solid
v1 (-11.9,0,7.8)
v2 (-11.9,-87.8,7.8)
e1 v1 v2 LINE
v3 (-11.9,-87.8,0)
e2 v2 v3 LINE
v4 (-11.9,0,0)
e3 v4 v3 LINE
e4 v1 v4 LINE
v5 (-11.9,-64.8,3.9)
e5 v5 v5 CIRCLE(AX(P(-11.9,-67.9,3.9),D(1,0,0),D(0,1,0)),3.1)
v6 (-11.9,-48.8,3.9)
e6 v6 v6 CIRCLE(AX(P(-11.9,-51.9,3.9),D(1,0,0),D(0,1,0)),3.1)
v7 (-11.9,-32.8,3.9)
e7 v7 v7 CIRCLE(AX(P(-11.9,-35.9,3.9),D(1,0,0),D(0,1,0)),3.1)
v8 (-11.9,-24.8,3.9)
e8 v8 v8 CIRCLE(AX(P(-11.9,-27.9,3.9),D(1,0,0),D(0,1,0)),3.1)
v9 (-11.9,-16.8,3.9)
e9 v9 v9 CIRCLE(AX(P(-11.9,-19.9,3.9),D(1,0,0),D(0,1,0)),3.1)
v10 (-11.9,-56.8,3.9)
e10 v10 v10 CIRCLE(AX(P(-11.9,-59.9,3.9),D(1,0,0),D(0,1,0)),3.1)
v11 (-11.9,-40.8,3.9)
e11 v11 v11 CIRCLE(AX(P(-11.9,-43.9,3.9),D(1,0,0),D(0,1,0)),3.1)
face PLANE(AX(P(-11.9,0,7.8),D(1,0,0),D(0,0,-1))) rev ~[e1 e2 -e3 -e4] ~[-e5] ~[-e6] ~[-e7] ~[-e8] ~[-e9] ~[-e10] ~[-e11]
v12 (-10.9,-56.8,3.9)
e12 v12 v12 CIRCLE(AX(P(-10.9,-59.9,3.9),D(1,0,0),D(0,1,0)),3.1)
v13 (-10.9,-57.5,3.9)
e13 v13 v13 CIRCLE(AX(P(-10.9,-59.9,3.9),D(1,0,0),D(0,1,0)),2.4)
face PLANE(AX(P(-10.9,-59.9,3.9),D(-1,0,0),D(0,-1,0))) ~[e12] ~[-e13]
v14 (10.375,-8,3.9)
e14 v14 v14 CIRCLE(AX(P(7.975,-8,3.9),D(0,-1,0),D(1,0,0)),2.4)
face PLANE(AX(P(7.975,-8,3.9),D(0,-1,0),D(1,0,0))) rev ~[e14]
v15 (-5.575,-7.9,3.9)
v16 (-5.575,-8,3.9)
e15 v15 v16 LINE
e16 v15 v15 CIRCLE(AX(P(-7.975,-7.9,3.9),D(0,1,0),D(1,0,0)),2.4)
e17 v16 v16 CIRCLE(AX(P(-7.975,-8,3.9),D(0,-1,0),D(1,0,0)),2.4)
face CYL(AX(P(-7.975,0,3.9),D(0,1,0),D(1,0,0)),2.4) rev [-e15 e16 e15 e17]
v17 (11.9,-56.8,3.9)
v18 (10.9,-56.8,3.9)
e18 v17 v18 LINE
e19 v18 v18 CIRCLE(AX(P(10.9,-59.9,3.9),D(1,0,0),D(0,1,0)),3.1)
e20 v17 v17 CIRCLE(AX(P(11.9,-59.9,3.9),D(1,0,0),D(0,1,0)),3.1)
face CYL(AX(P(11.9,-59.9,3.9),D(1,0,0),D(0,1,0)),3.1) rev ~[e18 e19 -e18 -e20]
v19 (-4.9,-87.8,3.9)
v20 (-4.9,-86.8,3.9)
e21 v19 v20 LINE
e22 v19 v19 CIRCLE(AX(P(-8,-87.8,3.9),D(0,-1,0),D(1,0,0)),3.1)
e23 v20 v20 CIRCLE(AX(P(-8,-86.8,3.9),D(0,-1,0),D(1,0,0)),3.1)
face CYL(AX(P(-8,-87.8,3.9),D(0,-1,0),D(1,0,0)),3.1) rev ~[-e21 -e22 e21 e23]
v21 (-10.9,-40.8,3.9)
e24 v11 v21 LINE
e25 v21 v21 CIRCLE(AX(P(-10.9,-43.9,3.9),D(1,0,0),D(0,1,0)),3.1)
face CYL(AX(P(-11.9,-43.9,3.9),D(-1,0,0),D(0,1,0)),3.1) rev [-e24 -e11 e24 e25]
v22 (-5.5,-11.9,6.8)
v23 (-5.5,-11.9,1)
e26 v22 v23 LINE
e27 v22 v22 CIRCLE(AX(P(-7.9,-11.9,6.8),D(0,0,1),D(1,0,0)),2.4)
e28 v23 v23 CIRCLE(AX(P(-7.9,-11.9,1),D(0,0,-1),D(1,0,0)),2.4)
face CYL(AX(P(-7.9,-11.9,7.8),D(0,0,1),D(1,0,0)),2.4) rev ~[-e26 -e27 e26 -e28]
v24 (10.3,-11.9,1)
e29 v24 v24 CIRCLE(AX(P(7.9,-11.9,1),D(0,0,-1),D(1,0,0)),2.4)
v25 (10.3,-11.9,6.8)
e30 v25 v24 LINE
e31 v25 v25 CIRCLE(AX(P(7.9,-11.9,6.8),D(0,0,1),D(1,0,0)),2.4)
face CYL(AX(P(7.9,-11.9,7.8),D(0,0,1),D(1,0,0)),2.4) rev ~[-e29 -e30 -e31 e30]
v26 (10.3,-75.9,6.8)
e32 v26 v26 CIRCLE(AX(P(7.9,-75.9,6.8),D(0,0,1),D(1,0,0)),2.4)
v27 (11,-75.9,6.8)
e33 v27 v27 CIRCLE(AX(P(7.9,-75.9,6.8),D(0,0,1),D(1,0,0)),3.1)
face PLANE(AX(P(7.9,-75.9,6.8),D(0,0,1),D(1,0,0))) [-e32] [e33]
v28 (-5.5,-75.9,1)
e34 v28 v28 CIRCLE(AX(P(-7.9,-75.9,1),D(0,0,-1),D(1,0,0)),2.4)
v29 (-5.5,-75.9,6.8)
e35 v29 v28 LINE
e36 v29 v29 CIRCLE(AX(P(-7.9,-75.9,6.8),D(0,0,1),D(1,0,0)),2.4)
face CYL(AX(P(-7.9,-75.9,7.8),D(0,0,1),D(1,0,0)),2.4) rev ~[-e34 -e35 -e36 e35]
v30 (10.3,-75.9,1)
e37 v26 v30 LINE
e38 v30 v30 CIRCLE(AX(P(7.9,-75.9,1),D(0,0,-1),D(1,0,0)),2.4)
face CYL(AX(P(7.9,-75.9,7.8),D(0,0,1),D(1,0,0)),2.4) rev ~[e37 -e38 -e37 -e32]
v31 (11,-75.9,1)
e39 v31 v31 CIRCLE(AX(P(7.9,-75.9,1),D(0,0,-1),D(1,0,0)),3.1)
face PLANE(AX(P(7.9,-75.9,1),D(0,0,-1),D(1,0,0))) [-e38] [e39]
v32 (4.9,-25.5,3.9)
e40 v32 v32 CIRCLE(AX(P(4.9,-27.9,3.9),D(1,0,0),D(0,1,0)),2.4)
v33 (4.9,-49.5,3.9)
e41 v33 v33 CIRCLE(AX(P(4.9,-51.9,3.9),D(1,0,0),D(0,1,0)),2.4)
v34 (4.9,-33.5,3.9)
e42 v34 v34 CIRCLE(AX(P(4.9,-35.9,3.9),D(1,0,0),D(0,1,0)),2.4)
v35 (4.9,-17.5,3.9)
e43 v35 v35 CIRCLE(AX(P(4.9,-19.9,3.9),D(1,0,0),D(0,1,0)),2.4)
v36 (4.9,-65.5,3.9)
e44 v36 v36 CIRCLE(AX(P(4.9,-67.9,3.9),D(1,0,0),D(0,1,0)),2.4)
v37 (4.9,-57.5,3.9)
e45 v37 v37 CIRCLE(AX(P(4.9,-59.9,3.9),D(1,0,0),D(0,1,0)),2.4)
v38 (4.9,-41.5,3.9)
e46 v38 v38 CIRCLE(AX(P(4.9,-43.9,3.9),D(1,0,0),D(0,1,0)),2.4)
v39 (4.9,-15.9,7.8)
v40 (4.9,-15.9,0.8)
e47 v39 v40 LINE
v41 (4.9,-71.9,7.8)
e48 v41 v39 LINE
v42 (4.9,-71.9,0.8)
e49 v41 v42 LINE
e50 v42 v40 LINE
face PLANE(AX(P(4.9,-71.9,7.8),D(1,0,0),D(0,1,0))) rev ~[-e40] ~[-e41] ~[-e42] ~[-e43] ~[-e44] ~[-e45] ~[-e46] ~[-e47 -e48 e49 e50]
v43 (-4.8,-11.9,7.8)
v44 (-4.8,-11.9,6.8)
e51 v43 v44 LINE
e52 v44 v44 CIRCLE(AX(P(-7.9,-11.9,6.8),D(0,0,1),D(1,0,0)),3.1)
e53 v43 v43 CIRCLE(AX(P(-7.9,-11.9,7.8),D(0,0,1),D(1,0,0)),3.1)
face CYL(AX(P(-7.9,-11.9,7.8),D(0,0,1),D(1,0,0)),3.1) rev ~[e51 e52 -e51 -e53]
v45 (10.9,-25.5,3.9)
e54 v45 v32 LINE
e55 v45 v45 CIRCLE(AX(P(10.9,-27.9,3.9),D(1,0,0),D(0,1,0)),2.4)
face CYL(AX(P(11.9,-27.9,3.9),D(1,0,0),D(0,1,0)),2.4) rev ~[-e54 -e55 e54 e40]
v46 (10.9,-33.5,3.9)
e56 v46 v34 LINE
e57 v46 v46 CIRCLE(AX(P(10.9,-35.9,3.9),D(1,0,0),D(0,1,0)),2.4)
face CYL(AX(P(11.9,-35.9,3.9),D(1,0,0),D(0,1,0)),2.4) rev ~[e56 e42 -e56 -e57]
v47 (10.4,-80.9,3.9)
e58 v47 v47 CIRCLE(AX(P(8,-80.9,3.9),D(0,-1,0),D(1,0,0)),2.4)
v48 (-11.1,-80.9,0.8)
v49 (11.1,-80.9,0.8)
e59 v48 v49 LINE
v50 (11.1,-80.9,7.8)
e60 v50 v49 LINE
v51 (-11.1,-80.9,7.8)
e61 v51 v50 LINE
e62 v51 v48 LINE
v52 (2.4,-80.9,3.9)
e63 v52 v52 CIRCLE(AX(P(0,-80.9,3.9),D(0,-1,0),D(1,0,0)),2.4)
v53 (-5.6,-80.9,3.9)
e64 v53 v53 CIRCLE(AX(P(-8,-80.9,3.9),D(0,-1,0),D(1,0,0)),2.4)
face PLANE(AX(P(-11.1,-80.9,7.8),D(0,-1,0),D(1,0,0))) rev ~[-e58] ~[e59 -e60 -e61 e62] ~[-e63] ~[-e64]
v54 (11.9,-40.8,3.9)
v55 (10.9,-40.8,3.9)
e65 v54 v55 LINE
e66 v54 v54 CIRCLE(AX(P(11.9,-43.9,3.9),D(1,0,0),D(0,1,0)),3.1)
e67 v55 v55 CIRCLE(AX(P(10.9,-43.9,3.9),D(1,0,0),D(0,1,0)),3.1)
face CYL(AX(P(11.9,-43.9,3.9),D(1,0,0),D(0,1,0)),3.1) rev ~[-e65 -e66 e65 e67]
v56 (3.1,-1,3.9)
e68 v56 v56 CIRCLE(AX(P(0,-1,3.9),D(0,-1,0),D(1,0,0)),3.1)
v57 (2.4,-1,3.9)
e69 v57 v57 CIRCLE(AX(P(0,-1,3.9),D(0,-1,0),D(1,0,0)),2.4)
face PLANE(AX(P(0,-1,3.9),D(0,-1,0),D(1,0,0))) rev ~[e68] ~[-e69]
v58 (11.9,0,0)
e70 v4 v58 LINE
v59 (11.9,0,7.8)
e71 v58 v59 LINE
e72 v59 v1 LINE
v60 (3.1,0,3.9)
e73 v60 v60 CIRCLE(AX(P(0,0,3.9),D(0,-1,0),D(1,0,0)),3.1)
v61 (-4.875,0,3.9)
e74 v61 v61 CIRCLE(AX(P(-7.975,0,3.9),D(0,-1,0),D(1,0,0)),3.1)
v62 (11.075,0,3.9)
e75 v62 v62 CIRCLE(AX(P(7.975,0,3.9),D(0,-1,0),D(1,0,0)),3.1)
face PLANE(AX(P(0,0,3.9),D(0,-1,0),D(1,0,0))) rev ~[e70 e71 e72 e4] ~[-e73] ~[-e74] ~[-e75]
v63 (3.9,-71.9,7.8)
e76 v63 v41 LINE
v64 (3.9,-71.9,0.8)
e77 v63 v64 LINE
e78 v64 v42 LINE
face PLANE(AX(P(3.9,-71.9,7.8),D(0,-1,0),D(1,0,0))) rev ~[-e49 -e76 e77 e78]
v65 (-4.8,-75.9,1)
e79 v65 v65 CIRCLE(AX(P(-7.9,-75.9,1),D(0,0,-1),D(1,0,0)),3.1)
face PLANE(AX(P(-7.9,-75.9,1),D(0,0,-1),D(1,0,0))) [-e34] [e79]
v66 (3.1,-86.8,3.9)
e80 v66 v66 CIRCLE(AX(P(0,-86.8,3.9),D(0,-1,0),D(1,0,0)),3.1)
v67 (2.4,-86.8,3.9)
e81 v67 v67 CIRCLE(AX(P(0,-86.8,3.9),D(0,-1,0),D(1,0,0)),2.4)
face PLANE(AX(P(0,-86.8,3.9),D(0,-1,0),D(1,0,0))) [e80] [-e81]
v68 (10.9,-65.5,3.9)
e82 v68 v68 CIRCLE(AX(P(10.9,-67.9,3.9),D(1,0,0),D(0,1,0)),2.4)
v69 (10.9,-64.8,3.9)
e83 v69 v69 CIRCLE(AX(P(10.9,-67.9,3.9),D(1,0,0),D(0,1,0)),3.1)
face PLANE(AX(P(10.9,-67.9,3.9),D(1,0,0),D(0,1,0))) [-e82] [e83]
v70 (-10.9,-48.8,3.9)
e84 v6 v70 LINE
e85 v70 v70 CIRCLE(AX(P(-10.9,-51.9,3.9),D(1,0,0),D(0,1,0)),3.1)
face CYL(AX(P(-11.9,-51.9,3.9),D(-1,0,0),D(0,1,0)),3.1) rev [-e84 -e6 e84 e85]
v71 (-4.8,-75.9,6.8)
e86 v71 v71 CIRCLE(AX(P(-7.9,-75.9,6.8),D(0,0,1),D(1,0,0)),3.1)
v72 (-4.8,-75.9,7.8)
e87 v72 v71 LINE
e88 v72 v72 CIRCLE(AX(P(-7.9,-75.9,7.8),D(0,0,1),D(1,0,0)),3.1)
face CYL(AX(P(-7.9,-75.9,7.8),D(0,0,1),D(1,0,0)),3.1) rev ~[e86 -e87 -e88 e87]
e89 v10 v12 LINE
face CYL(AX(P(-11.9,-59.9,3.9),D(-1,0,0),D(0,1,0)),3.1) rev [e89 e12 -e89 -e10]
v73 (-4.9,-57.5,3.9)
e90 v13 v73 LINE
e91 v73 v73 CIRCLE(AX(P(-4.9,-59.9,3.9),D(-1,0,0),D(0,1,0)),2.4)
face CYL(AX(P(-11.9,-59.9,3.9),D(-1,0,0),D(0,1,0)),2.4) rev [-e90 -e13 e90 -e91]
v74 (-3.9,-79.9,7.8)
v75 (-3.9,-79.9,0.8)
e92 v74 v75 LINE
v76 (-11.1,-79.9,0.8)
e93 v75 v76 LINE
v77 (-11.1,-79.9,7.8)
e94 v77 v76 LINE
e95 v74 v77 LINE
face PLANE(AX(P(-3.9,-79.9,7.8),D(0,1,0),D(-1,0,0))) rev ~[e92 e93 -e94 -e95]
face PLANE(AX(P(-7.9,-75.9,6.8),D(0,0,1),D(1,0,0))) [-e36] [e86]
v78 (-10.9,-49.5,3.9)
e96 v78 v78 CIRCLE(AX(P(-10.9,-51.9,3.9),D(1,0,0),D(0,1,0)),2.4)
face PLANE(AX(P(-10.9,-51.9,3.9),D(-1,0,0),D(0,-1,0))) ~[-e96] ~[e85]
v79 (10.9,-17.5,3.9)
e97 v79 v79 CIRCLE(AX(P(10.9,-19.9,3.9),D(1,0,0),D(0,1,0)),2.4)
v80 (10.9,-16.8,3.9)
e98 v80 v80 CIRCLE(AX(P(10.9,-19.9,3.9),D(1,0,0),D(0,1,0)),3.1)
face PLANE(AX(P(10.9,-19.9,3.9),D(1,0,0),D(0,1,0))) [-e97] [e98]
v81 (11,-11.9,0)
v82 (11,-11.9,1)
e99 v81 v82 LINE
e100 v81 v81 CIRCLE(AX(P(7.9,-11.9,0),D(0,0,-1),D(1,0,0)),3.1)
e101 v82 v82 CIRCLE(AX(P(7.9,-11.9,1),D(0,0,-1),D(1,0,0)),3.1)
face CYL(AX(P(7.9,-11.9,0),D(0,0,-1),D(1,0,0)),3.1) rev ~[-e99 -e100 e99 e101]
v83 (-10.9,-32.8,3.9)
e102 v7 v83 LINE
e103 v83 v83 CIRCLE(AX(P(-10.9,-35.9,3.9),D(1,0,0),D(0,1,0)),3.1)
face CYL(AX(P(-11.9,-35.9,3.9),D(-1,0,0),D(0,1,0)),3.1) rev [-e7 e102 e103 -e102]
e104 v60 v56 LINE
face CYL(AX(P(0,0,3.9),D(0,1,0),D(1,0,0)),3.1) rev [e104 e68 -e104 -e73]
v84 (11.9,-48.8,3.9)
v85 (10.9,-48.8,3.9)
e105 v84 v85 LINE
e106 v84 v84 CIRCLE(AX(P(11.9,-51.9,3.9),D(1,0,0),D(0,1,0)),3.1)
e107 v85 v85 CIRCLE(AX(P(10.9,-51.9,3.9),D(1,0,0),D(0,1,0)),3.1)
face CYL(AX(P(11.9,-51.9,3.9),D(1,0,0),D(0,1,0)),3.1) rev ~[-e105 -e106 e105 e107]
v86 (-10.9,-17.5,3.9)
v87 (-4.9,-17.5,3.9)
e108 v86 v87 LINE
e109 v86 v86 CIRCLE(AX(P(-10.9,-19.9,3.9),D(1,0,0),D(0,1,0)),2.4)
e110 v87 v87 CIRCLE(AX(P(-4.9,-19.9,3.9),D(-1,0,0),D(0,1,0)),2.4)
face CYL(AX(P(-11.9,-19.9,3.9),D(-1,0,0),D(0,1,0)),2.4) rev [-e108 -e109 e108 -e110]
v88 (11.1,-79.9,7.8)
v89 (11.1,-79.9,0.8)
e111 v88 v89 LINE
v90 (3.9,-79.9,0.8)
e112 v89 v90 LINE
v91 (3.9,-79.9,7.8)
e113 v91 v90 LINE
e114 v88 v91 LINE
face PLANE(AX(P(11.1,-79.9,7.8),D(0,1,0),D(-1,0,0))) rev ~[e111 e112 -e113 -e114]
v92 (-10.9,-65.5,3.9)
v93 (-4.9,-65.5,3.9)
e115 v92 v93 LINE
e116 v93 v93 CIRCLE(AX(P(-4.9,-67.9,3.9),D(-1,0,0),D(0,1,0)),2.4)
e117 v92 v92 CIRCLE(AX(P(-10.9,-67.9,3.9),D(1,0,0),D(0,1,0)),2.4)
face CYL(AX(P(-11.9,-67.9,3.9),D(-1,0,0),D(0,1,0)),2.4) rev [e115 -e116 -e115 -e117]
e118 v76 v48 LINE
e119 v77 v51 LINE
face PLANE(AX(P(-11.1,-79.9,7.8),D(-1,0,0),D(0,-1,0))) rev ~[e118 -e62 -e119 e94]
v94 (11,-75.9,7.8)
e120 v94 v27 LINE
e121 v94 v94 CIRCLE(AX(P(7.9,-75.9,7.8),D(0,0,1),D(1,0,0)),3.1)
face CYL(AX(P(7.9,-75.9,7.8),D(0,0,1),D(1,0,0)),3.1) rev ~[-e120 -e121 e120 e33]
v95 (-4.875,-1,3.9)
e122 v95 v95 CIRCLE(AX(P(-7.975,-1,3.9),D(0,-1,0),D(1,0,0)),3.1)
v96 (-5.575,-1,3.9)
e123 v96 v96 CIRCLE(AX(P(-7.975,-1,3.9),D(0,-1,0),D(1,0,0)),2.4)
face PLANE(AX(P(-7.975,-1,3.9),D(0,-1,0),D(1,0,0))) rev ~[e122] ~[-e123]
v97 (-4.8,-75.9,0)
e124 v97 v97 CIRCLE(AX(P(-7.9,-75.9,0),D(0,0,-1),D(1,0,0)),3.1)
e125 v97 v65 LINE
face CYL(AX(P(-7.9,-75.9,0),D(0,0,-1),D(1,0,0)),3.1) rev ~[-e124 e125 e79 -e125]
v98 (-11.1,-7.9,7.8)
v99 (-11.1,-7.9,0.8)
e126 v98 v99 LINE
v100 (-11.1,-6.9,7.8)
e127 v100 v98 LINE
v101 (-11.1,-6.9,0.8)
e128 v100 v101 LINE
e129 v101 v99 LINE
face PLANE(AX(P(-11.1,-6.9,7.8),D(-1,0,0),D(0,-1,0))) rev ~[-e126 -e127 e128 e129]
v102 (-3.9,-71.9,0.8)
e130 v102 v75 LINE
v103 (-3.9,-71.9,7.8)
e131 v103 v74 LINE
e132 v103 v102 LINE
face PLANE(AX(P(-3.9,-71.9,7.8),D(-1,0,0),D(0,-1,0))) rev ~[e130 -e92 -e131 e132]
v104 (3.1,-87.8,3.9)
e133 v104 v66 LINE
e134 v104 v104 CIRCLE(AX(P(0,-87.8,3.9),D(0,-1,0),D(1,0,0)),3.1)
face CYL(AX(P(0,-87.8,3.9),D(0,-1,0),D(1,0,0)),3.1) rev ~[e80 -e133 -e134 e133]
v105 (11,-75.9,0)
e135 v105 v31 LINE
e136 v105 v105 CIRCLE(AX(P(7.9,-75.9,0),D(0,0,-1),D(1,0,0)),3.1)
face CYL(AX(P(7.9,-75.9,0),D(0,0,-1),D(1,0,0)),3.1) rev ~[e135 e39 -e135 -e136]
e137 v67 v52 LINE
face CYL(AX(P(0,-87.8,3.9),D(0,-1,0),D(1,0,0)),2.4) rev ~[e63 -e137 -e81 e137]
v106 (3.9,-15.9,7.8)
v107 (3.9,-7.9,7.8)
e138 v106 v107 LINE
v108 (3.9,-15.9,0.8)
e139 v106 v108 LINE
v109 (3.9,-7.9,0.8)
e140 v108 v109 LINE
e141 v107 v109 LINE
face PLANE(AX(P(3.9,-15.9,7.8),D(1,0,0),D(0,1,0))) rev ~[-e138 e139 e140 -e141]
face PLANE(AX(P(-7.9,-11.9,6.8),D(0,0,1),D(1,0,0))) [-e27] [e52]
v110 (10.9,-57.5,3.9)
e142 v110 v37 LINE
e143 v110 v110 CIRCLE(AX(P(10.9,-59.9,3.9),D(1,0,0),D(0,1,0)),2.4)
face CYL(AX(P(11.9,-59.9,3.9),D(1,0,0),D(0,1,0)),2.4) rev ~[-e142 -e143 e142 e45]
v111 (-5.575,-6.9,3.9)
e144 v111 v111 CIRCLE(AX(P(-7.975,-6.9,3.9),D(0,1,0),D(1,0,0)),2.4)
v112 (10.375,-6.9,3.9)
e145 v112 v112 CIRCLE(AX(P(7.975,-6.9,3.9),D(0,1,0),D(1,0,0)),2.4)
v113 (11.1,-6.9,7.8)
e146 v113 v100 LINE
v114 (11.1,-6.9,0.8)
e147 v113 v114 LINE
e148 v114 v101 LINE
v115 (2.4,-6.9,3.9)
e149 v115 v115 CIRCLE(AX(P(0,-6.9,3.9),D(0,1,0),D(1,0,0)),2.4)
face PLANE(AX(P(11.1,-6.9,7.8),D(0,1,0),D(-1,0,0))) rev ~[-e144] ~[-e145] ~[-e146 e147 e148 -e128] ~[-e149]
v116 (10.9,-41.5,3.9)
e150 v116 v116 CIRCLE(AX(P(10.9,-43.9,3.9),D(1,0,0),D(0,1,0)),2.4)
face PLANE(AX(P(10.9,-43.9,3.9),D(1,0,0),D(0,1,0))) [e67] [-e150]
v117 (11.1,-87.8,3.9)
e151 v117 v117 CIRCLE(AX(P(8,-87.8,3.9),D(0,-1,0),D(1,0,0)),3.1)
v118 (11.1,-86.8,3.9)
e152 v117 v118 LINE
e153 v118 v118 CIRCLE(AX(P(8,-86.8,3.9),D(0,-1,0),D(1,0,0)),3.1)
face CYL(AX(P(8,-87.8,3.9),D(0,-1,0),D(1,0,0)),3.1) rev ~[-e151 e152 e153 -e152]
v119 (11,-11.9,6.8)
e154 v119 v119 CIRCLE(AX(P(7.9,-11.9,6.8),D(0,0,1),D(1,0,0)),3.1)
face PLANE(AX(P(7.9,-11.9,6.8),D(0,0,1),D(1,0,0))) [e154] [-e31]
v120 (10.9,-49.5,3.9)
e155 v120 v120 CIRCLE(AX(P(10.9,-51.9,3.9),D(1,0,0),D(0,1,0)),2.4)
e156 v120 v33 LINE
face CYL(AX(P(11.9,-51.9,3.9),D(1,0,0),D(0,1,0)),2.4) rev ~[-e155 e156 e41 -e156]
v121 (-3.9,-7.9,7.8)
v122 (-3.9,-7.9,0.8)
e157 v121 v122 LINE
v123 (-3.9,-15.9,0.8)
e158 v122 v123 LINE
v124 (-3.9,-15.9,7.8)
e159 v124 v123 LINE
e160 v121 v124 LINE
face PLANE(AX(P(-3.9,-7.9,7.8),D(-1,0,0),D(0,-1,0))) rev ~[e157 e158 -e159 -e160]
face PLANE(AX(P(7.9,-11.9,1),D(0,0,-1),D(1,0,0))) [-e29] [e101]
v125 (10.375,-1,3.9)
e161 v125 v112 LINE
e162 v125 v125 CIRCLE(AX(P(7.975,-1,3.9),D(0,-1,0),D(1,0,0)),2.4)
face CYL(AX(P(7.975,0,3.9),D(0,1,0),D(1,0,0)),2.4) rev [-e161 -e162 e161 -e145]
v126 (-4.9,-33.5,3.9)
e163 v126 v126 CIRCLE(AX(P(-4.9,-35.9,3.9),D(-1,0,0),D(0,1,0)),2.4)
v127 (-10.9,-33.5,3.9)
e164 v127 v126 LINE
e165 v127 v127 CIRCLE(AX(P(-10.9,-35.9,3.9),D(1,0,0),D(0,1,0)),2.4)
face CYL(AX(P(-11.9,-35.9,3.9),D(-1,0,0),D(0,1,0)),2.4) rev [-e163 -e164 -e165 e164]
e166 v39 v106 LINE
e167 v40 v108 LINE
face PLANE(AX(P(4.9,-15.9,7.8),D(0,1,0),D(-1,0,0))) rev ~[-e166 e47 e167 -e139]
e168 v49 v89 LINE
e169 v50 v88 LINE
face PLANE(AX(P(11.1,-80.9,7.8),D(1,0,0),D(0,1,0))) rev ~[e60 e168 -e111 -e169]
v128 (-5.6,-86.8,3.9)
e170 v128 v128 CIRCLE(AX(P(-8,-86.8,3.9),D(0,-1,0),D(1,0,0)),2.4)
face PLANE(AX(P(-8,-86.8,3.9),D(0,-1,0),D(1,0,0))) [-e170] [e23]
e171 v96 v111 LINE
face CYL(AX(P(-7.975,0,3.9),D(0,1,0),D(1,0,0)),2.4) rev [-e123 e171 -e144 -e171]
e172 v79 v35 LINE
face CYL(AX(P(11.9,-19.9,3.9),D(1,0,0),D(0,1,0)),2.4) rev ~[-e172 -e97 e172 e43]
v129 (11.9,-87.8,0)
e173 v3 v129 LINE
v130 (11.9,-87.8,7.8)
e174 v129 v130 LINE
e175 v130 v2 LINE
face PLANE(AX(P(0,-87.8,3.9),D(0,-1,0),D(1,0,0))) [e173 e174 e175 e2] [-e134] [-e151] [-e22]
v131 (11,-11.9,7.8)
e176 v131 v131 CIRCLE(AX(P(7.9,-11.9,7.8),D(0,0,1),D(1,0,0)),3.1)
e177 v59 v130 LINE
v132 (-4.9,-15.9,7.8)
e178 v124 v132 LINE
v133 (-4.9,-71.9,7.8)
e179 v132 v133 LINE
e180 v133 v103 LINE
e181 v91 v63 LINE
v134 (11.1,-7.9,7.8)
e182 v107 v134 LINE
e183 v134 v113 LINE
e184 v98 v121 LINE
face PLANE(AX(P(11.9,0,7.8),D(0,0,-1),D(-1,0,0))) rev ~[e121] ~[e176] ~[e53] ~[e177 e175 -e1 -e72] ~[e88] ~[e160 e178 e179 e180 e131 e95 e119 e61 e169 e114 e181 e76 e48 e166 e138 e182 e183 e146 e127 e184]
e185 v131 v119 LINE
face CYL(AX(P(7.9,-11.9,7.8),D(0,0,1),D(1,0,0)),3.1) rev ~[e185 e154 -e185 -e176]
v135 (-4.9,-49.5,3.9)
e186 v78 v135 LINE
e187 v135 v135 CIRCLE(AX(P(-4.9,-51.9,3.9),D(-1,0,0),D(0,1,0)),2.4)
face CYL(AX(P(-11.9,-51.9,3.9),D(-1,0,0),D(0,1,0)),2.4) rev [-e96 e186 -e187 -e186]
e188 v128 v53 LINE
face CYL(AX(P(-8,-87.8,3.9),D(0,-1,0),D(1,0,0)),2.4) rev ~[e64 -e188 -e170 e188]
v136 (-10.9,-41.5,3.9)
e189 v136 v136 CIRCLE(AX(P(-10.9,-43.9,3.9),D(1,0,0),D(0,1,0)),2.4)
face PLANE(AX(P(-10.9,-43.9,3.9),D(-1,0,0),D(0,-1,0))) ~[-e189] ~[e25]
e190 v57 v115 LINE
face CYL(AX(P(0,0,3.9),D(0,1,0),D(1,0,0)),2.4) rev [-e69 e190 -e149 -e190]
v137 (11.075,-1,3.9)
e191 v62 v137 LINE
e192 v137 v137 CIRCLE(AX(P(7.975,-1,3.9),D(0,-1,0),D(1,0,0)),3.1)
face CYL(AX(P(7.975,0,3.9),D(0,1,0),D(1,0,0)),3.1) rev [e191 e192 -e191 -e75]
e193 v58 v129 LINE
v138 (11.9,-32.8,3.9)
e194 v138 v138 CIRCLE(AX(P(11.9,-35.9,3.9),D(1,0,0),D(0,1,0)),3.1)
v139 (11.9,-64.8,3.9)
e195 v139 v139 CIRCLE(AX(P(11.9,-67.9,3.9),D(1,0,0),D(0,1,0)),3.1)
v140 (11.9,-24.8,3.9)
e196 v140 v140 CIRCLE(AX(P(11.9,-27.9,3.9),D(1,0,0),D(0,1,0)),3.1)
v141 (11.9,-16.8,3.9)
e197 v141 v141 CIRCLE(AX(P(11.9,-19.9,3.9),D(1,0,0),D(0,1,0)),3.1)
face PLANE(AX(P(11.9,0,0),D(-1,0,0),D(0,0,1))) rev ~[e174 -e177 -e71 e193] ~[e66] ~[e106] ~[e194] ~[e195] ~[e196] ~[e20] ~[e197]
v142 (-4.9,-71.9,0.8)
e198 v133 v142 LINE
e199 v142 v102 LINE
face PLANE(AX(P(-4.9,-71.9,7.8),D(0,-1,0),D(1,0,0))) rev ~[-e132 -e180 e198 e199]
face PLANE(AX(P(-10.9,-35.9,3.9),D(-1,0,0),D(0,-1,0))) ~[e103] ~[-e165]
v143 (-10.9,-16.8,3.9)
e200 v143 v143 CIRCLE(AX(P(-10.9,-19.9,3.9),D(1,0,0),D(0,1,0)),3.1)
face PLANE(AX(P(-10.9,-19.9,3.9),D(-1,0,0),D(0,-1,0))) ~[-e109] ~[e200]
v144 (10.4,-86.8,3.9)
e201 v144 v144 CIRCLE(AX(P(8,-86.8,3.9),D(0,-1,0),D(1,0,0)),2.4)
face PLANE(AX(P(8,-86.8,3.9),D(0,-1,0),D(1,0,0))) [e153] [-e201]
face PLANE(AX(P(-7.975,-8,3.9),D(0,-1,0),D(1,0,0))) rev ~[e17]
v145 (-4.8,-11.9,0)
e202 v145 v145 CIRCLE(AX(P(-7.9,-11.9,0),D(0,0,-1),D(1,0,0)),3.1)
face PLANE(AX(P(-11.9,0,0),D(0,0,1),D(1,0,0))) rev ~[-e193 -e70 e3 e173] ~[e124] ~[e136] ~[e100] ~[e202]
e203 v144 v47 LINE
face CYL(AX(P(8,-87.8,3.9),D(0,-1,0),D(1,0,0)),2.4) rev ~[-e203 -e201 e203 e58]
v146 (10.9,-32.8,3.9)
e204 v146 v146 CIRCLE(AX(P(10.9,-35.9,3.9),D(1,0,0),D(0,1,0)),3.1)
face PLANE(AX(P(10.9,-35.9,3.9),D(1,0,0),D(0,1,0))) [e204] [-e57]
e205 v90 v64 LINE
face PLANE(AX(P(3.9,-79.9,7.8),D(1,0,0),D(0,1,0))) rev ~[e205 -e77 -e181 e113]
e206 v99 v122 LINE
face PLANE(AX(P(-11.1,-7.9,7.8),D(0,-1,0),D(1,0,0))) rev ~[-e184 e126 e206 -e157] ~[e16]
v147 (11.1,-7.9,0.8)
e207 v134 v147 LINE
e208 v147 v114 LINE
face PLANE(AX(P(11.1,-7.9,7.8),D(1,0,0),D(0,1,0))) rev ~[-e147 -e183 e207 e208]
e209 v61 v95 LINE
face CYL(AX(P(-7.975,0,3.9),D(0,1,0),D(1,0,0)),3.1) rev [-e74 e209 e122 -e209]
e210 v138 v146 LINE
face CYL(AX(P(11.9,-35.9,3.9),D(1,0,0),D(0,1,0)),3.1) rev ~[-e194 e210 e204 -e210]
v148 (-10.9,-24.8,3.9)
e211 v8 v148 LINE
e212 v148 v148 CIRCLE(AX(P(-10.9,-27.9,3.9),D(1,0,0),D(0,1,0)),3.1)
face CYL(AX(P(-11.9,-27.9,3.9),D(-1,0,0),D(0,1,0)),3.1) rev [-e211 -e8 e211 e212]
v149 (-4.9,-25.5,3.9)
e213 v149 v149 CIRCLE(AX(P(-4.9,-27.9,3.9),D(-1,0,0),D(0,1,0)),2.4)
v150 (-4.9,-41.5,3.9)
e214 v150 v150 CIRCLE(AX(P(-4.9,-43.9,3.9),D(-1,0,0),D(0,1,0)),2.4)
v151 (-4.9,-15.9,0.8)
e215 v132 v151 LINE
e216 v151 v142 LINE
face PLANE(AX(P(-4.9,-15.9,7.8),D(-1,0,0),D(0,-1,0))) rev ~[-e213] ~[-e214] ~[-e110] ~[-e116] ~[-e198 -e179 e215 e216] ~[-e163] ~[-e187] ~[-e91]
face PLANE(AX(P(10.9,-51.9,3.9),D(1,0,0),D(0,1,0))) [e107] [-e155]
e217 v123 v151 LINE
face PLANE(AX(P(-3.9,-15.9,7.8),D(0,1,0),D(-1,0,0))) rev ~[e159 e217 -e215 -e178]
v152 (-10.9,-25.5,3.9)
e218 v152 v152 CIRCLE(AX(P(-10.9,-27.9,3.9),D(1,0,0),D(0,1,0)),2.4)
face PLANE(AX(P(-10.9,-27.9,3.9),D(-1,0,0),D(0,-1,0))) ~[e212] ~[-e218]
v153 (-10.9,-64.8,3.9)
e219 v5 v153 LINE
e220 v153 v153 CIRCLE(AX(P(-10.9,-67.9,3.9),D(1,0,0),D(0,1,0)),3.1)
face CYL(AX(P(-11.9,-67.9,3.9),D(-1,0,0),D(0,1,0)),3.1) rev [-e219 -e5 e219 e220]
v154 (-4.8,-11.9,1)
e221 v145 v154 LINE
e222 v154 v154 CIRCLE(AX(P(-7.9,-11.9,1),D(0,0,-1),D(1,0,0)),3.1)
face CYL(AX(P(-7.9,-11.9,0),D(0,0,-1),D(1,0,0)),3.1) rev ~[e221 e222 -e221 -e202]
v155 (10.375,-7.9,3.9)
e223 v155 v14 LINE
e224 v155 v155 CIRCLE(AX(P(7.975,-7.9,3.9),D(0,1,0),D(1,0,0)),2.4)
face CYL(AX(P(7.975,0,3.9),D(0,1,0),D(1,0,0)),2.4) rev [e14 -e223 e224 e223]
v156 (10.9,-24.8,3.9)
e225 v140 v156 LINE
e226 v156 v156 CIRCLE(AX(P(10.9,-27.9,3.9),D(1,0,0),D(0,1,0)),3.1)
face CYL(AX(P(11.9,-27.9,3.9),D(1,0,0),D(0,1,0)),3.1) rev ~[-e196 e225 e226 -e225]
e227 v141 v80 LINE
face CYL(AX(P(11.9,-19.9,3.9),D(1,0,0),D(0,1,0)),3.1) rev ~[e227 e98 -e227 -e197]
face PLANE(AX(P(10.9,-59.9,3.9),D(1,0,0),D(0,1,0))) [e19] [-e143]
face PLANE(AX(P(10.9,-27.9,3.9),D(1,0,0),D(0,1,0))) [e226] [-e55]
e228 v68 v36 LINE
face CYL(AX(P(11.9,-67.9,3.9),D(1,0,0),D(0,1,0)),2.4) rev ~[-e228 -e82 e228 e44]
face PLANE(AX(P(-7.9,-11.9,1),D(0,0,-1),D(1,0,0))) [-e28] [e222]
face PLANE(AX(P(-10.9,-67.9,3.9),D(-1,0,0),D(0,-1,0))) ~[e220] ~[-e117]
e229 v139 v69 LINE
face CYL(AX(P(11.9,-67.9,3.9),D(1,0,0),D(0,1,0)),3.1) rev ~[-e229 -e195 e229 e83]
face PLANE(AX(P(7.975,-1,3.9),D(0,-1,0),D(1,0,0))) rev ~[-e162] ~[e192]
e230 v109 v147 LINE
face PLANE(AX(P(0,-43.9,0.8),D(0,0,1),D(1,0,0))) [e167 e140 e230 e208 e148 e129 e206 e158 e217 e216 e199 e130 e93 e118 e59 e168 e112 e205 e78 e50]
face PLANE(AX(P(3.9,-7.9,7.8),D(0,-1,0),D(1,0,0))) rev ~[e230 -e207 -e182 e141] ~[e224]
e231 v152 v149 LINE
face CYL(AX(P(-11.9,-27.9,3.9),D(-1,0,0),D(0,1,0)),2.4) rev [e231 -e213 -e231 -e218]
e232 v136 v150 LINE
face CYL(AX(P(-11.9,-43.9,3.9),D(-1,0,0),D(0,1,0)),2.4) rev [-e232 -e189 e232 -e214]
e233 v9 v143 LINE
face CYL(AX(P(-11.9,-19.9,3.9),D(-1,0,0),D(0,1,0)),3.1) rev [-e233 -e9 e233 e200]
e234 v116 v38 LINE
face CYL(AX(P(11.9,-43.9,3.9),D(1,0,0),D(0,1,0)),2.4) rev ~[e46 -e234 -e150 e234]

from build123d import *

# Parameters (mm, degrees)
F0_R      = 3.1
F0_R_2    = 2.4
F1_DEPTH  = 87.8
F2_DEPTH  = 1
F3_DEPTH  = 8
F4_R      = 2.4
F5_DEPTH  = 25
F4_R_2    = 3.1
F6_DEPTH  = 1
F7_R      = 3.1
F7_R_2    = 2.4
F8_DEPTH  = 1
F9_R      = 2.4
F10_DEPTH = 8
F9_R_2    = 3.1
F11_DEPTH = 1
F12_DEPTH = 7
F13_R     = 2.4
F14_DEPTH = 7.9
F13_R_2   = 3.1
F15_DEPTH = 1


# Not quite as in the source:
# - a pattern or mirror of a feature is missing from the dataset's text; its kind, count and spacing are read off the source's solid


with BuildPart() as f1:
    # F0 (on Front) → F1 (new body)
    with BuildSketch(Plane.XZ):
        Polygon((4, 7.8), (0, 7.8), (-4, 7.8), (-11.9, 7.8), (-11.9, 0), (0, 0), (11.9, 0), (11.9, 7.8), align=None)
        with Locations((-7.975, 3.9)):
            Circle(F0_R, mode=Mode.SUBTRACT)
        with Locations((0, 3.9)):
            Circle(F0_R, mode=Mode.SUBTRACT)
        with Locations((7.975, 3.9)):
            Circle(F0_R, mode=Mode.SUBTRACT)
        with Locations((7.975, 3.9)):
            Circle(F0_R)
        with Locations((7.975, 3.9)):
            Circle(F0_R_2, mode=Mode.SUBTRACT)
        with Locations((0, 3.9)):
            Circle(F0_R)
        with Locations((0, 3.9)):
            Circle(F0_R_2, mode=Mode.SUBTRACT)
        with Locations((-7.975, 3.9)):
            Circle(F0_R)
        with Locations((-7.975, 3.9)):
            Circle(F0_R_2, mode=Mode.SUBTRACT)
        with Locations((-7.975, 3.9)):
            Circle(F0_R_2)
        with Locations((0, 3.9)):
            Circle(F0_R_2)
        with Locations((7.975, 3.9)):
            Circle(F0_R_2)
    extrude(amount=F1_DEPTH)

    # F0 (on Front) → F2 (cut)
    with BuildSketch(Plane.XZ):
        with Locations((7.975, 3.9)):
            Circle(F0_R)
        with Locations((7.975, 3.9)):
            Circle(F0_R_2, mode=Mode.SUBTRACT)
        with Locations((0, 3.9)):
            Circle(F0_R)
        with Locations((0, 3.9)):
            Circle(F0_R_2, mode=Mode.SUBTRACT)
        with Locations((-7.975, 3.9)):
            Circle(F0_R)
        with Locations((-7.975, 3.9)):
            Circle(F0_R_2, mode=Mode.SUBTRACT)
    extrude(amount=F2_DEPTH, mode=Mode.SUBTRACT)

    # F0 (on Front) → F3 (cut)
    with BuildSketch(Plane.XZ):
        with Locations((-7.975, 3.9)):
            Circle(F0_R_2)
        with Locations((0, 3.9)):
            Circle(F0_R_2)
        with Locations((7.975, 3.9)):
            Circle(F0_R_2)
    extrude(amount=F3_DEPTH, mode=Mode.SUBTRACT)

    # F4 (on face) → F5 (cut)
    with BuildSketch(Plane.XY.offset(7.8)):
        with Locations((-7.9, -11.9)):
            Circle(F4_R)
        with Locations((-7.9, -75.9)):
            Circle(F4_R)
        with Locations((7.9, -75.9)):
            Circle(F4_R)
        with Locations((7.9, -11.9)):
            Circle(F4_R)
    extrude(amount=-F5_DEPTH, mode=Mode.SUBTRACT)

    # F4 (on face) → F6 (cut)
    with BuildSketch(Plane.XY.offset(7.8)):
        with Locations((-7.9, -11.9)):
            Circle(F4_R_2)
        with Locations((-7.9, -11.9)):
            Circle(F4_R, mode=Mode.SUBTRACT)
        with Locations((7.9, -11.9)):
            Circle(F4_R_2)
        with Locations((7.9, -11.9)):
            Circle(F4_R, mode=Mode.SUBTRACT)
        with Locations((-7.9, -75.9)):
            Circle(F4_R_2)
        with Locations((-7.9, -75.9)):
            Circle(F4_R, mode=Mode.SUBTRACT)
        with Locations((7.9, -75.9)):
            Circle(F4_R_2)
        with Locations((7.9, -75.9)):
            Circle(F4_R, mode=Mode.SUBTRACT)
    extrude(amount=-F6_DEPTH, mode=Mode.SUBTRACT)

    # F7 (on face) → F8 (cut)
    with BuildSketch(Plane(origin=(0, 0, 0), x_dir=(1, 0, 0), z_dir=(0, 0, -1))):
        with Locations((7.9, 75.9)):
            Circle(F7_R)
        with Locations((7.9, 75.9)):
            Circle(F7_R_2, mode=Mode.SUBTRACT)
        with Locations((-7.9, 75.9)):
            Circle(F7_R)
        with Locations((-7.9, 75.9)):
            Circle(F7_R_2, mode=Mode.SUBTRACT)
        with Locations((-7.9, 11.9)):
            Circle(F7_R)
        with Locations((-7.9, 11.9)):
            Circle(F7_R_2, mode=Mode.SUBTRACT)
        with Locations((7.9, 11.9)):
            Circle(F7_R)
        with Locations((7.9, 11.9)):
            Circle(F7_R_2, mode=Mode.SUBTRACT)
    extrude(amount=-F8_DEPTH, mode=Mode.SUBTRACT)

    # F9 (on face) → F10 (cut)
    with BuildSketch(Plane.YZ.offset(11.9)):
        with Locations((-67.9, 3.9)):
            Circle(F9_R)
        with Locations((-59.9, 3.9)):
            Circle(F9_R)
        with Locations((-51.9, 3.9)):
            Circle(F9_R)
        with Locations((-43.9, 3.9)):
            Circle(F9_R)
        with Locations((-35.9, 3.9)):
            Circle(F9_R)
        with Locations((-27.9, 3.9)):
            Circle(F9_R)
        with Locations((-19.9, 3.9)):
            Circle(F9_R)
    f10 = extrude(amount=-F10_DEPTH, mode=Mode.SUBTRACT)

    # F10_copies: F10 across plane
    add(f10.mirror(Plane(origin=(0, 0, 0), x_dir=(0, 0, -1), z_dir=(-1, 0, 0))), mode=Mode.SUBTRACT)

    # F9 (on face) → F11 (cut)
    with BuildSketch(Plane.YZ.offset(11.9)):
        with Locations((-67.9, 3.9)):
            Circle(F9_R_2)
        with Locations((-67.9, 3.9)):
            Circle(F9_R, mode=Mode.SUBTRACT)
        with Locations((-59.9, 3.9)):
            Circle(F9_R_2)
        with Locations((-59.9, 3.9)):
            Circle(F9_R, mode=Mode.SUBTRACT)
        with Locations((-51.9, 3.9)):
            Circle(F9_R_2)
        with Locations((-51.9, 3.9)):
            Circle(F9_R, mode=Mode.SUBTRACT)
        with Locations((-43.9, 3.9)):
            Circle(F9_R_2)
        with Locations((-43.9, 3.9)):
            Circle(F9_R, mode=Mode.SUBTRACT)
        with Locations((-35.9, 3.9)):
            Circle(F9_R_2)
        with Locations((-35.9, 3.9)):
            Circle(F9_R, mode=Mode.SUBTRACT)
        with Locations((-27.9, 3.9)):
            Circle(F9_R_2)
        with Locations((-27.9, 3.9)):
            Circle(F9_R, mode=Mode.SUBTRACT)
        with Locations((-19.9, 3.9)):
            Circle(F9_R_2)
        with Locations((-19.9, 3.9)):
            Circle(F9_R, mode=Mode.SUBTRACT)
    f11 = extrude(amount=-F11_DEPTH, mode=Mode.SUBTRACT)

    # F11_copies: F11 across plane
    add(f11.mirror(Plane(origin=(0, 0, 0), x_dir=(0, 0, -1), z_dir=(-1, 0, 0))), mode=Mode.SUBTRACT)

    # F4 (on face) → F12 (cut)
    with BuildSketch(Plane.XY.offset(7.8)):
        Polygon((-11.1, -6.9), (-11.1, -7.9), (-3.9, -7.9), (-3.9, -15.9), (-4.9, -15.9), (-4.9, -71.9), (-3.9, -71.9), (-3.9, -79.9), (-11.1, -79.9), (-11.1, -80.9), (11.1, -80.9), (11.1, -79.9), (3.9, -79.9), (3.9, -71.9), (4.9, -71.9), (4.9, -15.9), (3.9, -15.9), (3.9, -7.9), (11.1, -7.9), (11.1, -6.9), align=None)
    extrude(amount=-F12_DEPTH, mode=Mode.SUBTRACT)

    # F13 (on face) → F14 (cut)
    with BuildSketch(Plane.XZ.offset(87.8)):
        with Locations((-8, 3.9)):
            Circle(F13_R)
        with Locations((0, 3.9)):
            Circle(F13_R)
        with Locations((8, 3.9)):
            Circle(F13_R)
    extrude(amount=-F14_DEPTH, mode=Mode.SUBTRACT)

    # F13 (on face) → F15 (cut)
    with BuildSketch(Plane.XZ.offset(87.8)):
        with Locations((-8, 3.9)):
            Circle(F13_R_2)
        with Locations((-8, 3.9)):
            Circle(F13_R, mode=Mode.SUBTRACT)
        with Locations((0, 3.9)):
            Circle(F13_R_2)
        with Locations((0, 3.9)):
            Circle(F13_R, mode=Mode.SUBTRACT)
        with Locations((8, 3.9)):
            Circle(F13_R_2)
        with Locations((8, 3.9)):
            Circle(F13_R, mode=Mode.SUBTRACT)
    extrude(amount=-F15_DEPTH, mode=Mode.SUBTRACT)


solid = f1.part
